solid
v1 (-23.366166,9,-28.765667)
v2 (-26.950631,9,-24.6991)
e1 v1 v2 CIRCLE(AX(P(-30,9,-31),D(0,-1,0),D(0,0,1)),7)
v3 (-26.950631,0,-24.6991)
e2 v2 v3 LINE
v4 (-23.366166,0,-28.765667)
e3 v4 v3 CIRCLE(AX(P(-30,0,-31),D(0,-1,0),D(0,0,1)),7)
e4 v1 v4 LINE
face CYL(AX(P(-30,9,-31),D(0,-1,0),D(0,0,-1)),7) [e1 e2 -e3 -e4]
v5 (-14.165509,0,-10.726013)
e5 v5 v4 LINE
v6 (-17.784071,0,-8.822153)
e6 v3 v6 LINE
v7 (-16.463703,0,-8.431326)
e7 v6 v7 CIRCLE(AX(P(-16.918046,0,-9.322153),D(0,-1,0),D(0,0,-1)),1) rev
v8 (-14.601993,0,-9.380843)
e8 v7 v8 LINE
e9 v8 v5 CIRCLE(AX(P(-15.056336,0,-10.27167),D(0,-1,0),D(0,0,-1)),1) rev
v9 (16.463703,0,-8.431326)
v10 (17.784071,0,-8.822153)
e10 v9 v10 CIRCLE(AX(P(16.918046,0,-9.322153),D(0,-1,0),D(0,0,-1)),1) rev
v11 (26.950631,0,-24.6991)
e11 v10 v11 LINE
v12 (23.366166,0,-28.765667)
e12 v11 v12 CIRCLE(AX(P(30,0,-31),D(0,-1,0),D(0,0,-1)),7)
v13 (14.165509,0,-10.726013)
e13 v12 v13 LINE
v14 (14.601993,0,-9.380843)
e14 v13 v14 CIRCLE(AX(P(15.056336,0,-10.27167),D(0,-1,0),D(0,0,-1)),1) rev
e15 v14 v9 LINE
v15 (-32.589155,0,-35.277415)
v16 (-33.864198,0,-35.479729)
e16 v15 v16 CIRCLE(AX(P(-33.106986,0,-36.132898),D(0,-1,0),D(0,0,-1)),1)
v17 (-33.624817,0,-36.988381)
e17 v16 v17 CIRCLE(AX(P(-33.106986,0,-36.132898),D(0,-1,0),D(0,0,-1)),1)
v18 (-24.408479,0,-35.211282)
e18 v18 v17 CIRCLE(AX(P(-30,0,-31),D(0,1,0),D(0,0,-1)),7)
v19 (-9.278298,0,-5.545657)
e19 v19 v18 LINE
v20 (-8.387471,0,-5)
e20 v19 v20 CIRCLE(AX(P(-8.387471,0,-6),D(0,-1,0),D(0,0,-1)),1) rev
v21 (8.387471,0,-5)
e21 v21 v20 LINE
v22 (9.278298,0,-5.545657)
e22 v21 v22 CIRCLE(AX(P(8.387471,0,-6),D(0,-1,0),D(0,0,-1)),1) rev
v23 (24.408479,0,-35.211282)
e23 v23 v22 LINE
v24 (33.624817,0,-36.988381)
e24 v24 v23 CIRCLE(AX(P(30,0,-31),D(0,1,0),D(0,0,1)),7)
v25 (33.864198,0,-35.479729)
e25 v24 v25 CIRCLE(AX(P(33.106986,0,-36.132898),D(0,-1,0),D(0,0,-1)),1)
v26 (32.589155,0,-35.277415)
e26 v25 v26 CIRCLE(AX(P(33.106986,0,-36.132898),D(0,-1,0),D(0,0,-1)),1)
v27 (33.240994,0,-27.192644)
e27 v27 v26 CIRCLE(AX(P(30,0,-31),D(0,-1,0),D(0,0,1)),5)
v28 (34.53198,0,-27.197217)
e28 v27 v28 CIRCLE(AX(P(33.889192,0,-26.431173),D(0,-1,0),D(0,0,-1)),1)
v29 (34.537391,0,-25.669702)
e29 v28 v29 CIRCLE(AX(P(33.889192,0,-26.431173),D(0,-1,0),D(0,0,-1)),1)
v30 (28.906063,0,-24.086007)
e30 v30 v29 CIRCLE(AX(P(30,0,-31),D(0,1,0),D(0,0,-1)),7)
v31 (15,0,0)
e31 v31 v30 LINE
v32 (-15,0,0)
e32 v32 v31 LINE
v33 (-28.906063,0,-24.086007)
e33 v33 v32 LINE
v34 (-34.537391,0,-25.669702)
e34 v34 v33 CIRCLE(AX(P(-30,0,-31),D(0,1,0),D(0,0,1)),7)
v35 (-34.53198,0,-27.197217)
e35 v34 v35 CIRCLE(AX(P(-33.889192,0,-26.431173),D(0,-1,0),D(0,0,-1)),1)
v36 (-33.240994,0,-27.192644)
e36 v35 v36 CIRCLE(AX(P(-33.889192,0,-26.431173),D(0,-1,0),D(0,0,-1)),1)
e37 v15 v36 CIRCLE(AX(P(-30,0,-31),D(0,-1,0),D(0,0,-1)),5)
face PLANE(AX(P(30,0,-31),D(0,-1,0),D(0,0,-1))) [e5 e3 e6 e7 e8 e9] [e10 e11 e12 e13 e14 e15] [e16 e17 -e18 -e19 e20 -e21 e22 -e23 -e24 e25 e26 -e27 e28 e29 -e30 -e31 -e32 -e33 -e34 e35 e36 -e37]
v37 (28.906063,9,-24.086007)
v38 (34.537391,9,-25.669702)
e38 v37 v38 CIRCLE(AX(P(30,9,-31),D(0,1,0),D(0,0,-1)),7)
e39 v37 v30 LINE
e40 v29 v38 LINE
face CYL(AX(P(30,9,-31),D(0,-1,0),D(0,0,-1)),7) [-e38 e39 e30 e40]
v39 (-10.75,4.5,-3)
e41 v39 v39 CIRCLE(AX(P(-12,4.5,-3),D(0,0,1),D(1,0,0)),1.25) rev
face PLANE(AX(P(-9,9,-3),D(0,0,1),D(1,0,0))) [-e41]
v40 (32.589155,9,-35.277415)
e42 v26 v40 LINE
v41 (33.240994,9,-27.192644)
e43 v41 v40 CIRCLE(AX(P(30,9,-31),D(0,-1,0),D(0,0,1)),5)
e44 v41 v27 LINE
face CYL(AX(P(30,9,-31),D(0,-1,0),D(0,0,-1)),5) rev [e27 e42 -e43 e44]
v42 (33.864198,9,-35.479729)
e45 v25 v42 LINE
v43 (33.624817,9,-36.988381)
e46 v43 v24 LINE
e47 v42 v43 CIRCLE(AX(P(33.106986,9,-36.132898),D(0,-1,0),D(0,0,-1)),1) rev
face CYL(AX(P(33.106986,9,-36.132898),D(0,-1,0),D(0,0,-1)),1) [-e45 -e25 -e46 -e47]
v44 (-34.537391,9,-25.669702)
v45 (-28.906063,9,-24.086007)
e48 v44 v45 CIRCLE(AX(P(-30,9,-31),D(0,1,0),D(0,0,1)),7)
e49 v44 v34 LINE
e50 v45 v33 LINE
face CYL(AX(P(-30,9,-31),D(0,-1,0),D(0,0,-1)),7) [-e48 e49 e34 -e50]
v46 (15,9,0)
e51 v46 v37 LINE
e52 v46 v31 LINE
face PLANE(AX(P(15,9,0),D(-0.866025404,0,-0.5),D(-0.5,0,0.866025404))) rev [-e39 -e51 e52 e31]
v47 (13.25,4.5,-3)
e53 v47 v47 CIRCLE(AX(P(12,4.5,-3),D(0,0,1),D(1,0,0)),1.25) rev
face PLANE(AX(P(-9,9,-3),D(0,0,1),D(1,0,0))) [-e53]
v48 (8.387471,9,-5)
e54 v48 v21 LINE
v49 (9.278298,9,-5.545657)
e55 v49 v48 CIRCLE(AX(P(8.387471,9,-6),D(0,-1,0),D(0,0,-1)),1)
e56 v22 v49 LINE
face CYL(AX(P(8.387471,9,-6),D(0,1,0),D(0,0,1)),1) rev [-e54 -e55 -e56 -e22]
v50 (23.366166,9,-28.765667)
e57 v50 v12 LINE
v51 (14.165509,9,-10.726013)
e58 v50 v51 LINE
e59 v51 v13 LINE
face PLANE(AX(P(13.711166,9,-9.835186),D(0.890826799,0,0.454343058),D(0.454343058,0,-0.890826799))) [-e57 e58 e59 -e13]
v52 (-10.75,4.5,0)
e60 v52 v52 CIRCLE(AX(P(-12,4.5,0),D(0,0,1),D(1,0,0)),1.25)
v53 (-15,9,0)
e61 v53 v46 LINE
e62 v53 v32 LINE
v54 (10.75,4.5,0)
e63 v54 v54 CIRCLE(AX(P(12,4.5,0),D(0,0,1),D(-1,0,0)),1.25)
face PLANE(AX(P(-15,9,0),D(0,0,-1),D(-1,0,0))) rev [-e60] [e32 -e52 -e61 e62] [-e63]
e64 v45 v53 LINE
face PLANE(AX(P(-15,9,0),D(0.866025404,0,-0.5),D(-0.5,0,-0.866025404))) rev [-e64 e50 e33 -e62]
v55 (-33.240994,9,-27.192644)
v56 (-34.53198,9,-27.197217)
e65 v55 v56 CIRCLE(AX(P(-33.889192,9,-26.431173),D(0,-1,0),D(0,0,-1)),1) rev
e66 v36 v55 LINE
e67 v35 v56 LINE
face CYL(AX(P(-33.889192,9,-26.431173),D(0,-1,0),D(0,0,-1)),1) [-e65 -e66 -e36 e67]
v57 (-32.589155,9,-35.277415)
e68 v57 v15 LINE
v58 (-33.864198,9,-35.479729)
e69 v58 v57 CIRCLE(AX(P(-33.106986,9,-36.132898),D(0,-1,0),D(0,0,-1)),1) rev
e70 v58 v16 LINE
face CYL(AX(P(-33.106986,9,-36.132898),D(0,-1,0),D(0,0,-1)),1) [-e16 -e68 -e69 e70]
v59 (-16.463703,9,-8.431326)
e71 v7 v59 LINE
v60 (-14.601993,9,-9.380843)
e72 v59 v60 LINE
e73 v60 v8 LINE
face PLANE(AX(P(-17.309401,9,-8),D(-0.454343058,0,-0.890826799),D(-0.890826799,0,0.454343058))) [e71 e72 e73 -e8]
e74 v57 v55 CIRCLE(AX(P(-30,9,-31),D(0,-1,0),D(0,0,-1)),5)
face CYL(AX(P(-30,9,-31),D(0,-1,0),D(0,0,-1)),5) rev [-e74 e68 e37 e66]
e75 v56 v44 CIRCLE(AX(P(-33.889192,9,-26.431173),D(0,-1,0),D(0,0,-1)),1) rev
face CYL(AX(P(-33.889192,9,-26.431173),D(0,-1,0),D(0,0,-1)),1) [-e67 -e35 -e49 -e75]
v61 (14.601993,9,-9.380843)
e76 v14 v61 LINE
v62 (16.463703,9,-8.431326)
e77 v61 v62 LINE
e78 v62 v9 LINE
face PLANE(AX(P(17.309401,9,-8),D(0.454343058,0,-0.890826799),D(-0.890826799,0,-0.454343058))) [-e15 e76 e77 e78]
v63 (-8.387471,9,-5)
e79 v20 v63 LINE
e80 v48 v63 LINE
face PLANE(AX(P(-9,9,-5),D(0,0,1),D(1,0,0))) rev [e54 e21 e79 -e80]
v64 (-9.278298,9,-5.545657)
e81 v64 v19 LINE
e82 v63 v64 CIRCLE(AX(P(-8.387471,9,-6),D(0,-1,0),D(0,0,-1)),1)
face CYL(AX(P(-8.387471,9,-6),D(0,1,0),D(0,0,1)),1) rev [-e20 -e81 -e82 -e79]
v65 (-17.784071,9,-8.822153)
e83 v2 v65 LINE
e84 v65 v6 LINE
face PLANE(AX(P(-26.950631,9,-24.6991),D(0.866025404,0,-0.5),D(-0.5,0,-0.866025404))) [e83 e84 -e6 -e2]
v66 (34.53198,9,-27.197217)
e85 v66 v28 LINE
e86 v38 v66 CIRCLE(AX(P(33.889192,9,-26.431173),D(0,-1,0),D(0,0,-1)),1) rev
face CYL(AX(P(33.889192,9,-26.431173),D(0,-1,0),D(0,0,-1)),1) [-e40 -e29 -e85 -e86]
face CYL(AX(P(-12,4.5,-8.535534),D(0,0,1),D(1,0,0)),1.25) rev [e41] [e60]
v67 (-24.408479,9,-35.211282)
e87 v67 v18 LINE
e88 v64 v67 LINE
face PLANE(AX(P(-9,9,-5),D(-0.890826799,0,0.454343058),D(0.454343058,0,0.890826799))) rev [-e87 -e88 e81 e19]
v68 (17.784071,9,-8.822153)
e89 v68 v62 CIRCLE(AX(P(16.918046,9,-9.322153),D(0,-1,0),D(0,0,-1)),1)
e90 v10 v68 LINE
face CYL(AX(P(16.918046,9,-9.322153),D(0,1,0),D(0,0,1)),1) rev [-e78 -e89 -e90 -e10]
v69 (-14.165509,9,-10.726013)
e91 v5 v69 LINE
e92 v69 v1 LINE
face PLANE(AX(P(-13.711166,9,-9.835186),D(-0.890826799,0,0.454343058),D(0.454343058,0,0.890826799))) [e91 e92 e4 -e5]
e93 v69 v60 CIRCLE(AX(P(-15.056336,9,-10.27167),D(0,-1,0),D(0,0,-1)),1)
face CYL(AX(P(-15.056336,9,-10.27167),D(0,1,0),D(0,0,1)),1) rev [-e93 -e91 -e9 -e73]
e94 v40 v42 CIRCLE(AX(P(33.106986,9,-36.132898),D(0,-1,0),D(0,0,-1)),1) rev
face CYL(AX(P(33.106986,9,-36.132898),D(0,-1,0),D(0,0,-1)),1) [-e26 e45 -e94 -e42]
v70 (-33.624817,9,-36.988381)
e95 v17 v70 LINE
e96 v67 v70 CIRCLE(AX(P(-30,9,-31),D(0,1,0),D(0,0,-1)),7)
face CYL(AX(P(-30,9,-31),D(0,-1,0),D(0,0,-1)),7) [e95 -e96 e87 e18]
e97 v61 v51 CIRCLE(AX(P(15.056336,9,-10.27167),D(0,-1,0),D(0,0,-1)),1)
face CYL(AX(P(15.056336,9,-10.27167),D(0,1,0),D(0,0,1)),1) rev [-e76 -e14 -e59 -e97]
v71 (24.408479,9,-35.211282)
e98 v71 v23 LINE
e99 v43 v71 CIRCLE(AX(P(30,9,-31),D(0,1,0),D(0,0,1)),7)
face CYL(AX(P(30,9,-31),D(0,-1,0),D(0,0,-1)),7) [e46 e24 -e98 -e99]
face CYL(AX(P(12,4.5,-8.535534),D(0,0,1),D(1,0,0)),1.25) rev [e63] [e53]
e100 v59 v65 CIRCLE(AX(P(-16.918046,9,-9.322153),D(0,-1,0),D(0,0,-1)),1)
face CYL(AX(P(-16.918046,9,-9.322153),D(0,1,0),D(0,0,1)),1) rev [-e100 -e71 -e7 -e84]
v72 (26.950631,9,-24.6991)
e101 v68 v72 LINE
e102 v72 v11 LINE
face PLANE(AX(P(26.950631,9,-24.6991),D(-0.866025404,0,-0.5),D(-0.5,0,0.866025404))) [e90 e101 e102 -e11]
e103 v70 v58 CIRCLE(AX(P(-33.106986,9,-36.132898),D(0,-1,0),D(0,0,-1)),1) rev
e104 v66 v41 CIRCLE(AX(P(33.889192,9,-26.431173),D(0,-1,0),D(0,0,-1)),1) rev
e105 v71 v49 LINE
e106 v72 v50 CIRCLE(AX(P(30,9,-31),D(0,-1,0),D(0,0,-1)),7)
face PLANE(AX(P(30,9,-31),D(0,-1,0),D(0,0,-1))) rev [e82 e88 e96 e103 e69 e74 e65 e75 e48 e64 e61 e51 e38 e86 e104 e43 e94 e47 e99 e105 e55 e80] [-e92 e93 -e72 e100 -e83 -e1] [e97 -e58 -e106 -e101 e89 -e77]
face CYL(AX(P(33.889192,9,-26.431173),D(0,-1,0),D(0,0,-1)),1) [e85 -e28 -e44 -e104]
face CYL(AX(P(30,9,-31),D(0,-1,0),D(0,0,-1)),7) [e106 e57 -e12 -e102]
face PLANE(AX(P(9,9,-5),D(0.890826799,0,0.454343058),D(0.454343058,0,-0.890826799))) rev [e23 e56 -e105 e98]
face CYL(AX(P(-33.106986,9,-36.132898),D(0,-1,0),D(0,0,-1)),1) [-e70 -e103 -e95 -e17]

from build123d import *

# Parameters (mm, degrees)
BOSS_EXTRUDE1_DEPTH = 9
FILLET3_R           = 1
SKETCH2_R           = 1.25
CUT_EXTRUDE1_DEPTH  = 3


with BuildPart() as part:
    # Sketch1 → Boss-Extrude1 (new body)
    with BuildSketch(Plane(origin=(0, 0, 0), x_dir=(1, 0, 0), z_dir=(0, 1, 0))):
        with BuildLine():
            Line((-15, 0), (15, 0))
            Line((15, 0), (28.906062556, 24.08600688))
            ThreePointArc((28.906062556, 24.08600688), (32.451975053, 24.443490384), (35.362311102, 26.500486732))
            Line((35.362311102, 26.500486732), (33.830222216, 27.786061952))
            ThreePointArc((33.830222216, 27.786061952), (25.016172377, 30.598176376), (33.265843673, 34.786061952))
            Line((33.265843673, 34.786061952), (34.572181143, 36.300486732))
            ThreePointArc((34.572181143, 36.300486732), (29.254107826, 37.9601469), (24.408479197, 35.211281884))
            Line((24.408479197, 35.211281884), (9, 5))
            Line((9, 5), (-9, 5))
            Line((-9, 5), (-24.408479197, 35.211281884))
            ThreePointArc((-24.408479197, 35.211281884), (-29.254107826, 37.9601469), (-34.572181143, 36.300486732))
            Line((-34.572181143, 36.300486732), (-33.265843673, 34.786061952))
            ThreePointArc((-33.265843673, 34.786061952), (-25.016172377, 30.598176376), (-33.830222216, 27.786061952))
            Line((-33.830222216, 27.786061952), (-35.362311102, 26.500486732))
            ThreePointArc((-35.362311102, 26.500486732), (-32.451975053, 24.443490384), (-28.906062556, 24.08600688))
            Line((-28.906062556, 24.08600688), (-15, 0))
        make_face()
        with BuildLine():
            Line((13.711166355, 9.835186109), (23.366165954, 28.765666577))
            ThreePointArc((23.366165954, 28.765666577), (24.748776454, 26.371322946), (26.950630684, 24.699099527))
            Line((26.950630684, 24.699099527), (17.309401077, 8))
            Line((17.309401077, 8), (13.711166355, 9.835186109))
        make_face(mode=Mode.SUBTRACT)
        with BuildLine():
            Line((-17.309401077, 8), (-13.711166355, 9.835186109))
            Line((-13.711166355, 9.835186109), (-23.366165954, 28.765666577))
            ThreePointArc((-23.366165954, 28.765666577), (-24.748776454, 26.371322946), (-26.950630684, 24.699099527))
            Line((-26.950630684, 24.699099527), (-17.309401077, 8))
        make_face(mode=Mode.SUBTRACT)
    extrude(amount=BOSS_EXTRUDE1_DEPTH)

    # Fillet3
    fillet3_edges = [part.edges().sort_by_distance(p)[0] for p in [
        (-33.265843673, 4.5, -34.786061952),
        (-34.572181143, 4.5, -36.300486732),
        (-33.830222216, 4.5, -27.786061952),
        (-35.362311102, 4.5, -26.500486732),
        (-17.309401077, 4.5, -8),
        (-13.711166355, 4.5, -9.835186109),
        (17.309401077, 4.5, -8),
        (13.711166355, 4.5, -9.835186109),
        (33.265843673, 4.5, -34.786061952),
        (34.572181143, 4.5, -36.300486732),
        (33.830222216, 4.5, -27.786061952),
        (35.362311102, 4.5, -26.500486732),
        (-9, 4.5, -5),
        (9, 4.5, -5),
    ]]
    fillet(fillet3_edges, radius=FILLET3_R - 0.0001)  # a hair under: the kernel refuses the full size

    # Sketch2 → Cut-Extrude1 (cut)
    with BuildSketch(Plane.XY):
        with Locations((-12, 4.5)):
            Circle(SKETCH2_R)
        with Locations((12, 4.5)):
            Circle(SKETCH2_R)
    extrude(amount=-CUT_EXTRUDE1_DEPTH, mode=Mode.SUBTRACT)


solid = part.part
